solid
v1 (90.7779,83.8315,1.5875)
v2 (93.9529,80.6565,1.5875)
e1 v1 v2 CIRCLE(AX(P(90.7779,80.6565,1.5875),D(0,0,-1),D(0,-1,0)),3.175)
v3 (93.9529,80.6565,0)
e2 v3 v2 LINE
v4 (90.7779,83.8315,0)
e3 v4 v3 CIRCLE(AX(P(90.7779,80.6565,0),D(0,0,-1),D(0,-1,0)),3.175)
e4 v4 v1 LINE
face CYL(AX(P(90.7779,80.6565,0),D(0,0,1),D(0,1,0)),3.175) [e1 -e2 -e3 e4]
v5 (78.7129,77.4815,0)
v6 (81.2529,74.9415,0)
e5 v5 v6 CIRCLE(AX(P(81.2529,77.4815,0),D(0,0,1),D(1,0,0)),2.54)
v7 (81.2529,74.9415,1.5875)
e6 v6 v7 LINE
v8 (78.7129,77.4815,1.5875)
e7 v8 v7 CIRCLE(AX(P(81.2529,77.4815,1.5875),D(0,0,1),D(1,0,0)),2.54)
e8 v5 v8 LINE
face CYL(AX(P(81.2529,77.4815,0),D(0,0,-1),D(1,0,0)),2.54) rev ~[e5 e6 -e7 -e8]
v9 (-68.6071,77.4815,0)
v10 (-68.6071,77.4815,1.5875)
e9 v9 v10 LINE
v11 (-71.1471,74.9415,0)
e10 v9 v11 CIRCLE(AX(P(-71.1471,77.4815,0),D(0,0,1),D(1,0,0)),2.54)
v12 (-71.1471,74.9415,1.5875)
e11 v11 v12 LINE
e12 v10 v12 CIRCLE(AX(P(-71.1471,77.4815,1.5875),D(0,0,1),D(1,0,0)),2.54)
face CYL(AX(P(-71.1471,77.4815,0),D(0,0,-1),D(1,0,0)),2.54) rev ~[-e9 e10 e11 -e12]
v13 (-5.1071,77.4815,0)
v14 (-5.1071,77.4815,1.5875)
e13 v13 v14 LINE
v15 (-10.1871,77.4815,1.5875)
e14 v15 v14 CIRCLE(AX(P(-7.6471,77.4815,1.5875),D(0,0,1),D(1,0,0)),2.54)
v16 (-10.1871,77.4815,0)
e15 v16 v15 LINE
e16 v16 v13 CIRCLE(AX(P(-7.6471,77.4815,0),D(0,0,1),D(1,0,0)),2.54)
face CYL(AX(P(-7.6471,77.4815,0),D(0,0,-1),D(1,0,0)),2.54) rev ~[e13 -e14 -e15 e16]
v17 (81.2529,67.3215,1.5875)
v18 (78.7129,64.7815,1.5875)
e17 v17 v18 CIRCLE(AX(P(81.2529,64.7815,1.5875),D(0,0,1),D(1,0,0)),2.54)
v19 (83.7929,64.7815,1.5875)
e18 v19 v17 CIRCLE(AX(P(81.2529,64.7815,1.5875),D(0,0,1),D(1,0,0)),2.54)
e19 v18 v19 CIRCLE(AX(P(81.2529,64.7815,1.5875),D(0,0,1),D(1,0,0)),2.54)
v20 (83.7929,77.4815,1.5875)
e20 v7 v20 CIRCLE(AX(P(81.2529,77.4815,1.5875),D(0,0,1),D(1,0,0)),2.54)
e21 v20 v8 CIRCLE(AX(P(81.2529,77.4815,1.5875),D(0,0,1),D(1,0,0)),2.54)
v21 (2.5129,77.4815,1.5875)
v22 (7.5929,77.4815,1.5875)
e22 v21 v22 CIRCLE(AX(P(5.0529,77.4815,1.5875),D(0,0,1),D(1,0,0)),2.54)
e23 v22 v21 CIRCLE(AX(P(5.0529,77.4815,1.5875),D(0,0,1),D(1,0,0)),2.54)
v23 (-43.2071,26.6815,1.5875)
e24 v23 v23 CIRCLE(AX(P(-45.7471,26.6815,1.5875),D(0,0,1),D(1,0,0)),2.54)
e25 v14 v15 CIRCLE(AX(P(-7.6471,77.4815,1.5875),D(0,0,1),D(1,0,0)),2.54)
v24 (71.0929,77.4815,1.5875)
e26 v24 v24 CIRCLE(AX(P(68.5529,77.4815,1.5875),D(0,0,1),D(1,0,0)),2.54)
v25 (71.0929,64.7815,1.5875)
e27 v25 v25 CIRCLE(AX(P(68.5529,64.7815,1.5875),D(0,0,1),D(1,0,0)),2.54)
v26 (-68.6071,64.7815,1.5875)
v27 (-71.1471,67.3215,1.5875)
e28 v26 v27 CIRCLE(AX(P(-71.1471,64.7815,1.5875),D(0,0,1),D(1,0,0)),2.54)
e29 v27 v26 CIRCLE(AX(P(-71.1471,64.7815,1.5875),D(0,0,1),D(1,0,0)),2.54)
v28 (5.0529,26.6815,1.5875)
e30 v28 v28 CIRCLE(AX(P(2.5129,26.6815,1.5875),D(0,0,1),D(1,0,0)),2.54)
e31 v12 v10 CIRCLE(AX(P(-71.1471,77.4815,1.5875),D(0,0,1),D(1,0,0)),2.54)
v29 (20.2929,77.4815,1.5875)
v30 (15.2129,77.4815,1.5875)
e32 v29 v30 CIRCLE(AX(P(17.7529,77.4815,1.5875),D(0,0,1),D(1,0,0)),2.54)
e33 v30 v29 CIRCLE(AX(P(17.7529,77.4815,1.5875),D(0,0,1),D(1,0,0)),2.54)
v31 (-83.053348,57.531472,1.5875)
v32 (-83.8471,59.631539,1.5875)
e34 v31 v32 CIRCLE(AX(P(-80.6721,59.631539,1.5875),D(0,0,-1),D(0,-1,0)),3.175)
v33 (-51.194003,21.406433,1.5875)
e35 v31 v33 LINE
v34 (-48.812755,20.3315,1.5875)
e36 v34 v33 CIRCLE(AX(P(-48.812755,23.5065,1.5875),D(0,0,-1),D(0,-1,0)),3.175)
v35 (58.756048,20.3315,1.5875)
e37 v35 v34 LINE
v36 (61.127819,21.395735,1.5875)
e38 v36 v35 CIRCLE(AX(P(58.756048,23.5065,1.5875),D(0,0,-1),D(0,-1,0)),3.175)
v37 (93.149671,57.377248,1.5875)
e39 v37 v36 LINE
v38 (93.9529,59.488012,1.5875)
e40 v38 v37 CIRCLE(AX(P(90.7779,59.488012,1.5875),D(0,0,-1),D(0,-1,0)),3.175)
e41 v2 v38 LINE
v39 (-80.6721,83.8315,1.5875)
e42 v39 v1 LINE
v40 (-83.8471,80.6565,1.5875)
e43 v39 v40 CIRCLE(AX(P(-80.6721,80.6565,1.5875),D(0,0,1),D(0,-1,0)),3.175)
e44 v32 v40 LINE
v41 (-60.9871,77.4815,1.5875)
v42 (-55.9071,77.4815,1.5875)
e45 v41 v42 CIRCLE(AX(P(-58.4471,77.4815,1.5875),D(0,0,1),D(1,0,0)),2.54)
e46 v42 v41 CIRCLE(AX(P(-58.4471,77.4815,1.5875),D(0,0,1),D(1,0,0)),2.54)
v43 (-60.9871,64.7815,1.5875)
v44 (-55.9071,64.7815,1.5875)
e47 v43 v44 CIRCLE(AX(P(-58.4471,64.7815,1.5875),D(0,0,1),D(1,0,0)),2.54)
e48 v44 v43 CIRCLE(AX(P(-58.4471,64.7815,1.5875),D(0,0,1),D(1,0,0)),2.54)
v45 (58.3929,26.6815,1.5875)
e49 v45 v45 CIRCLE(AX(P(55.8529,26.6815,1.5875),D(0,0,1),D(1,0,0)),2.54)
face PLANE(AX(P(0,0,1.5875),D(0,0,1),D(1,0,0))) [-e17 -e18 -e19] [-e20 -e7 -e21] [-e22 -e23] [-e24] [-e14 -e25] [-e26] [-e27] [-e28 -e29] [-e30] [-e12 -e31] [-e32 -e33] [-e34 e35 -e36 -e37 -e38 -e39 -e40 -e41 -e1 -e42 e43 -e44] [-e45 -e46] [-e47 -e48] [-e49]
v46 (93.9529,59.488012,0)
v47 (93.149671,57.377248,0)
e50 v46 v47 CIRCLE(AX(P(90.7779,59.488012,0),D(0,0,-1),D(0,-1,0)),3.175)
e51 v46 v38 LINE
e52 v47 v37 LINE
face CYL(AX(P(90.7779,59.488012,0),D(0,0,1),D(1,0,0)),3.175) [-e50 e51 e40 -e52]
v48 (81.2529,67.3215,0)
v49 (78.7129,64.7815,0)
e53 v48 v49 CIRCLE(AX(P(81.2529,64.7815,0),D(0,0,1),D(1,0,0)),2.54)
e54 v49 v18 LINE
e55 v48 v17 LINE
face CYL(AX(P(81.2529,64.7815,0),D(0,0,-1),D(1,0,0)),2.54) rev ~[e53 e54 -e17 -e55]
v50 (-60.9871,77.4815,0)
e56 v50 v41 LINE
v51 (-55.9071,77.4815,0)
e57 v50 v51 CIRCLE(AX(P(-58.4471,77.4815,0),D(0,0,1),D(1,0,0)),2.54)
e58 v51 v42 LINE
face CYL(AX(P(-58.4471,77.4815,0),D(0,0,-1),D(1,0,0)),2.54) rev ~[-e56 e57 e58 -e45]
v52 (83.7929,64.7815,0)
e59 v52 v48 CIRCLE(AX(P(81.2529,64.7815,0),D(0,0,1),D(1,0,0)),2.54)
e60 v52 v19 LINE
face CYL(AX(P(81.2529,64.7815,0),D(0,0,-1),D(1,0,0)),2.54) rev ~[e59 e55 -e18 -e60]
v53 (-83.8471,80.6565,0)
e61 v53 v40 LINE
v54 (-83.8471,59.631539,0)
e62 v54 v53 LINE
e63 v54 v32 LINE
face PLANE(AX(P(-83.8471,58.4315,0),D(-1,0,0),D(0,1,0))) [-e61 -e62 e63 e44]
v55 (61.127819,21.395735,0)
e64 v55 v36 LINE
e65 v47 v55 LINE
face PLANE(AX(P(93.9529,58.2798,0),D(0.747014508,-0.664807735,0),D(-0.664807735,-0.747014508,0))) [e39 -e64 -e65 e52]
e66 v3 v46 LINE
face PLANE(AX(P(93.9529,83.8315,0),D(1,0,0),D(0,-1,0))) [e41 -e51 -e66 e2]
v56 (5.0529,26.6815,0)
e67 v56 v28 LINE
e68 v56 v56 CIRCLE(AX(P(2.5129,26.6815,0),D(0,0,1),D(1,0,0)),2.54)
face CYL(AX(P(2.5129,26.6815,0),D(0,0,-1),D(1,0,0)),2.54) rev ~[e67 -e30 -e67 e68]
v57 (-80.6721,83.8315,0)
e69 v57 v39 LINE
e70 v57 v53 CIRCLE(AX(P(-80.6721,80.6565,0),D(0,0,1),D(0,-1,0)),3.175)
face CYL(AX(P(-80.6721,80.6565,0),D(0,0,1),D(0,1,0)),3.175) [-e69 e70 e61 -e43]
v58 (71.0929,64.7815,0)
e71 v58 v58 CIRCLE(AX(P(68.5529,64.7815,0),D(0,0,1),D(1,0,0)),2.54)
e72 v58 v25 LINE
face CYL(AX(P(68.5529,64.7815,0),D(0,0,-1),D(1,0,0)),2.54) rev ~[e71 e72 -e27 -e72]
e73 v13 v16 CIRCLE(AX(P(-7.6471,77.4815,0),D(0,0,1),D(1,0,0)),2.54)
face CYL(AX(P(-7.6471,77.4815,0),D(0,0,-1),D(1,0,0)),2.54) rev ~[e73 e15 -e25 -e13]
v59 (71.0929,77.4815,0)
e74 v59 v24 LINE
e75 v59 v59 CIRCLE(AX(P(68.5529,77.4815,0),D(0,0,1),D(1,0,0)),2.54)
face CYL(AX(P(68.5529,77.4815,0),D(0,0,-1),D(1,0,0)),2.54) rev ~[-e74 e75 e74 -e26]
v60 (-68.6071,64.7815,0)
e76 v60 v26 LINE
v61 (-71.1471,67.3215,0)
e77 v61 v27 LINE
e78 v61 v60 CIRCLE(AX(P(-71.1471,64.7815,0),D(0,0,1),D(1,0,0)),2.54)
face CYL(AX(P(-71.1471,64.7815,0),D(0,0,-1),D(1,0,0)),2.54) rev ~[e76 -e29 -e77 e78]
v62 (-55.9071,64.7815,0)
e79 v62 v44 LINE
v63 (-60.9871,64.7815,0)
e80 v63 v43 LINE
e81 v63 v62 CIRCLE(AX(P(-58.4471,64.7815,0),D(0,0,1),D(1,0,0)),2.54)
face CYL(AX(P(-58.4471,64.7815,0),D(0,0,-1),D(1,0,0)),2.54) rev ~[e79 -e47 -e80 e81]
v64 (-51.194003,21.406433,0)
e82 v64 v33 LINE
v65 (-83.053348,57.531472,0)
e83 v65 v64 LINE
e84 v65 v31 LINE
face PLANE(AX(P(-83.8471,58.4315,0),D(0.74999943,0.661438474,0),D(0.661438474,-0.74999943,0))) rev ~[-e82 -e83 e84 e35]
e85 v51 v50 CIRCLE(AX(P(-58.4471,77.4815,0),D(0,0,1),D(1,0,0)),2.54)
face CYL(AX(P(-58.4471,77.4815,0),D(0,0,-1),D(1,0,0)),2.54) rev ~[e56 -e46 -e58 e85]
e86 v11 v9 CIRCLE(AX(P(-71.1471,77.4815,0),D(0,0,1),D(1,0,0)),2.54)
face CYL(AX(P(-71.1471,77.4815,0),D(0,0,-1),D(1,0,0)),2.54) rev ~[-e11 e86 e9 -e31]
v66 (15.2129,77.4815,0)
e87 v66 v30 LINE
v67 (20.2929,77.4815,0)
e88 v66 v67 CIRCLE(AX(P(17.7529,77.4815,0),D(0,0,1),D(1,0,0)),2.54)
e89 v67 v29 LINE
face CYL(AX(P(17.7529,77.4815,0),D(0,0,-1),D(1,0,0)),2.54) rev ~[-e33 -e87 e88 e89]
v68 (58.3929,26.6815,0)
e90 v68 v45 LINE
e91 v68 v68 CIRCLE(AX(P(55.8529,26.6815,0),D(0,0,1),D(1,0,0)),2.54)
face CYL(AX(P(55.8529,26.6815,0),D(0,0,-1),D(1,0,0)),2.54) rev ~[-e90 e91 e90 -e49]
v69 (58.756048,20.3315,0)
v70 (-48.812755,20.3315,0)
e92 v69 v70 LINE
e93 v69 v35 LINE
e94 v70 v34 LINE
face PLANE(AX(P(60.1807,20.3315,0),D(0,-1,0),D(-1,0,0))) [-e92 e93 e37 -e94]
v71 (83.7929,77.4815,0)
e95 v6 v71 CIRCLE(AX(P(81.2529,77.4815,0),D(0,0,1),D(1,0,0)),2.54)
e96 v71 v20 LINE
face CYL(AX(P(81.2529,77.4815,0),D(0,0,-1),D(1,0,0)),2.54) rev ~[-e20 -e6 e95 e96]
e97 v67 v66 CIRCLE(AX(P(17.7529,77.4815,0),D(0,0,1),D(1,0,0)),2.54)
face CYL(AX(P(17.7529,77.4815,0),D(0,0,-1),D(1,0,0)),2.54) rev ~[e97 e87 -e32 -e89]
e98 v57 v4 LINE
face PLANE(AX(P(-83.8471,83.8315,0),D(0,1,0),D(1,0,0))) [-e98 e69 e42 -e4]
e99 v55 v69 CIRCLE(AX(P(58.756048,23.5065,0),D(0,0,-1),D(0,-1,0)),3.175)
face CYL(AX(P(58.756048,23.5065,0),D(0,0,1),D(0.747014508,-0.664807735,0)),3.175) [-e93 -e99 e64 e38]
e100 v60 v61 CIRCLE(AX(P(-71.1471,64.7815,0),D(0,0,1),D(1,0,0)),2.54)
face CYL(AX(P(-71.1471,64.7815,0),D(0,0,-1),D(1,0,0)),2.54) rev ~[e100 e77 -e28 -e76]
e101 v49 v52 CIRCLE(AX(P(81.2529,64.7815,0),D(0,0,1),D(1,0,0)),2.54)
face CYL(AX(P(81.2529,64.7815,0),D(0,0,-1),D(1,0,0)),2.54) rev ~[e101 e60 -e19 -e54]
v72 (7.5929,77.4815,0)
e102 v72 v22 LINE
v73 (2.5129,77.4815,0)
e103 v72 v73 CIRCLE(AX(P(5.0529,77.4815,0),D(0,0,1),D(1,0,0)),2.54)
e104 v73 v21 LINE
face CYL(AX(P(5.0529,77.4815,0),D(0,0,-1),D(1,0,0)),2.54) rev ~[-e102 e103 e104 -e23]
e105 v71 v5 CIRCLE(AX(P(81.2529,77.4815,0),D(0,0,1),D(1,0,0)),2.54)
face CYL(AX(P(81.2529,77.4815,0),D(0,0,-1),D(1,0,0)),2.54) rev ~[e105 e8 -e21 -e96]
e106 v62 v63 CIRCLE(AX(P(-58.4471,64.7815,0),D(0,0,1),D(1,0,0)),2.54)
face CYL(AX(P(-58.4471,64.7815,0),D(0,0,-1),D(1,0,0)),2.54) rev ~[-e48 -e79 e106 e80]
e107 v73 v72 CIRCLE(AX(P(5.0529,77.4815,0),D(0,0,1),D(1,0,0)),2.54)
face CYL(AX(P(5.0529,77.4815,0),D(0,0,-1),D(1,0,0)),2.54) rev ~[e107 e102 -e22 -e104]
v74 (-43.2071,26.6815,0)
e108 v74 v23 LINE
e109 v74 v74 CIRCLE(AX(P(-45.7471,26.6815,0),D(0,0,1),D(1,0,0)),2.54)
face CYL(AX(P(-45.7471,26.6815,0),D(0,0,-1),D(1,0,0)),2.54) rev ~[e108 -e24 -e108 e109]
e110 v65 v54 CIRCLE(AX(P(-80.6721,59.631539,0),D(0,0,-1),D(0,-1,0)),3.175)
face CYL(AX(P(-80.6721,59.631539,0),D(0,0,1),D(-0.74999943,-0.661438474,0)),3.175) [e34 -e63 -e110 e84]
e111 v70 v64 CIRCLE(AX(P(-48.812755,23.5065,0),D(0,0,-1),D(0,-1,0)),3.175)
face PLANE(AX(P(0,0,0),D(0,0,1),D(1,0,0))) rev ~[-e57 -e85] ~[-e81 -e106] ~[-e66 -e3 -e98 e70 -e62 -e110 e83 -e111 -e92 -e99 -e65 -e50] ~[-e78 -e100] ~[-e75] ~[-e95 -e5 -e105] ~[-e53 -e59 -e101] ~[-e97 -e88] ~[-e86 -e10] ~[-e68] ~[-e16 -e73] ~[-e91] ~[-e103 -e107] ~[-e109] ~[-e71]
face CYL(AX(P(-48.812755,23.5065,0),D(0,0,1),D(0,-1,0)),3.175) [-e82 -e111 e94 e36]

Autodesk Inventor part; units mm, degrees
ref_plane "YZ Plane" through (0, 0, 0) normal (1, 0, 0) x (0, 1, 0)
ref_plane "XZ Plane" through (0, 0, 0) normal (0, 1, 0) x (-1, 0, 0)
ref_plane "XY Plane" through (0, 0, 0) normal (0, 0, 1) x (1, 0, 0)
sketch "Sketch1" plane through (0, 0, 0) normal (0, 0, 1) x (1, 0, 0)
  line L0 (-83.8471, 83.8315) -> (93.9529, 83.8315)
  line L1 (93.9529, 83.8315) -> (93.9529, 20.3315)
  line L2 (93.9529, 20.3315) -> (-83.8471, 20.3315)
  line L3 (-83.8471, 20.3315) -> (-83.8471, 83.8315)
  line L4 (-83.8471, 20.3315) -> (-83.8471, 58.4315)
  line L5 (93.9529, 20.3315) -> (93.9529, 58.2798)
  line L6 (93.9529, 58.2798) -> (60.1807, 20.3315)
  line L7 (-83.8471, 58.4315) -> (-50.246, 20.3315)
  circle A0 centre (-58.4471, 77.4815) radius 2.54
  circle A1 centre (68.5529, 77.4815) radius 2.54
  circle A2 centre (2.5129, 26.6815) radius 2.54
  circle A3 centre (-45.7471, 26.6815) radius 2.54
  circle A4 centre (55.8529, 26.6815) radius 2.54
  line L8 (-58.4471, 77.4815) -> (-71.1471, 77.4815)
  circle A5 centre (-71.1471, 77.4815) radius 2.54
  line L9 (-71.1471, 77.4815) -> (-71.1471, 64.7815)
  line L10 (-71.1471, 64.7815) -> (-58.4471, 64.7815)
  circle A6 centre (-71.1471, 64.7815) radius 2.54
  circle A7 centre (-58.4471, 64.7815) radius 2.54
  line L11 (-58.4471, 77.4815) -> (5.0529, 77.4815)
  line L12 (5.0529, 77.4815) -> (-7.6471, 77.4815)
  circle A8 centre (-7.6471, 77.4815) radius 2.54
  circle A9 centre (5.0529, 77.4815) radius 2.54
  line L13 (5.0529, 77.4815) -> (17.7529, 77.4815)
  circle A10 centre (17.7529, 77.4815) radius 2.54
  line L14 (68.5529, 77.4815) -> (81.2529, 77.4815)
  line L15 (81.2529, 77.4815) -> (81.2529, 64.7815)
  line L16 (81.2529, 64.7815) -> (68.5529, 64.7815)
  circle A11 centre (81.2529, 77.4815) radius 2.54
  circle A12 centre (81.2529, 64.7815) radius 2.54
  circle A13 centre (68.5529, 64.7815) radius 2.54
  point P0 (0, 0)
  dimension "d0" = 177.8
  dimension "d1" = 63.5
  dimension "d2" = 38.1
  dimension "d3" = 50.8
  dimension "d4" = 50.8
  dimension "d18" = 6.35
  dimension "d19" = 25.4
  dimension "d20" = 5.08
  dimension "d21" = 5.08
  dimension "d22" = 6.35
  dimension "d23" = 25.4
  dimension "d24" = 5.08
  dimension "d25" = 6.35
  dimension "d26" = 86.36
  dimension "d29" = 6.35
  dimension "d30" = 6.35
  dimension "d31" = 38.1
  dimension "d32" = 38.1
  dimension "d33" = 5.08
  dimension "d34" = 5.08
  dimension "d39" = 12.7
  dimension "d40" = 5.08
  dimension "d41" = 12.7
  dimension "d42" = 5.08
  dimension "d43" = 5.08
  dimension "d44" = 12.7
  dimension "d45" = 5.08
  dimension "d46" = 5.08
  dimension "d47" = 12.7
  dimension "d48" = 5.08
  dimension "d49" = 12.7
  dimension "d50" = 12.7
  dimension "d51" = 12.7
  dimension "d52" = 5.08
  dimension "d53" = 5.08
  dimension "d54" = 5.08
extrude "Extrusion3" add sketch "Sketch1" along normal blind 1.5875 contours L0 L1 L6 L2 L7 L3
fillet "Fillet6" radius 3.175 4 edges at (-83.8471, 58.4315, 0.7937) (-50.246, 20.3315, 0.7937) (60.1807, 20.3315, 0.7937) (-83.8471, 83.8315, 0.7937)
fillet "Fillet7" radius 3.175 2 edges at (93.9529, 83.8315, 0.7937) (93.9529, 58.2798, 0.7937)
properties part number "wedge"
